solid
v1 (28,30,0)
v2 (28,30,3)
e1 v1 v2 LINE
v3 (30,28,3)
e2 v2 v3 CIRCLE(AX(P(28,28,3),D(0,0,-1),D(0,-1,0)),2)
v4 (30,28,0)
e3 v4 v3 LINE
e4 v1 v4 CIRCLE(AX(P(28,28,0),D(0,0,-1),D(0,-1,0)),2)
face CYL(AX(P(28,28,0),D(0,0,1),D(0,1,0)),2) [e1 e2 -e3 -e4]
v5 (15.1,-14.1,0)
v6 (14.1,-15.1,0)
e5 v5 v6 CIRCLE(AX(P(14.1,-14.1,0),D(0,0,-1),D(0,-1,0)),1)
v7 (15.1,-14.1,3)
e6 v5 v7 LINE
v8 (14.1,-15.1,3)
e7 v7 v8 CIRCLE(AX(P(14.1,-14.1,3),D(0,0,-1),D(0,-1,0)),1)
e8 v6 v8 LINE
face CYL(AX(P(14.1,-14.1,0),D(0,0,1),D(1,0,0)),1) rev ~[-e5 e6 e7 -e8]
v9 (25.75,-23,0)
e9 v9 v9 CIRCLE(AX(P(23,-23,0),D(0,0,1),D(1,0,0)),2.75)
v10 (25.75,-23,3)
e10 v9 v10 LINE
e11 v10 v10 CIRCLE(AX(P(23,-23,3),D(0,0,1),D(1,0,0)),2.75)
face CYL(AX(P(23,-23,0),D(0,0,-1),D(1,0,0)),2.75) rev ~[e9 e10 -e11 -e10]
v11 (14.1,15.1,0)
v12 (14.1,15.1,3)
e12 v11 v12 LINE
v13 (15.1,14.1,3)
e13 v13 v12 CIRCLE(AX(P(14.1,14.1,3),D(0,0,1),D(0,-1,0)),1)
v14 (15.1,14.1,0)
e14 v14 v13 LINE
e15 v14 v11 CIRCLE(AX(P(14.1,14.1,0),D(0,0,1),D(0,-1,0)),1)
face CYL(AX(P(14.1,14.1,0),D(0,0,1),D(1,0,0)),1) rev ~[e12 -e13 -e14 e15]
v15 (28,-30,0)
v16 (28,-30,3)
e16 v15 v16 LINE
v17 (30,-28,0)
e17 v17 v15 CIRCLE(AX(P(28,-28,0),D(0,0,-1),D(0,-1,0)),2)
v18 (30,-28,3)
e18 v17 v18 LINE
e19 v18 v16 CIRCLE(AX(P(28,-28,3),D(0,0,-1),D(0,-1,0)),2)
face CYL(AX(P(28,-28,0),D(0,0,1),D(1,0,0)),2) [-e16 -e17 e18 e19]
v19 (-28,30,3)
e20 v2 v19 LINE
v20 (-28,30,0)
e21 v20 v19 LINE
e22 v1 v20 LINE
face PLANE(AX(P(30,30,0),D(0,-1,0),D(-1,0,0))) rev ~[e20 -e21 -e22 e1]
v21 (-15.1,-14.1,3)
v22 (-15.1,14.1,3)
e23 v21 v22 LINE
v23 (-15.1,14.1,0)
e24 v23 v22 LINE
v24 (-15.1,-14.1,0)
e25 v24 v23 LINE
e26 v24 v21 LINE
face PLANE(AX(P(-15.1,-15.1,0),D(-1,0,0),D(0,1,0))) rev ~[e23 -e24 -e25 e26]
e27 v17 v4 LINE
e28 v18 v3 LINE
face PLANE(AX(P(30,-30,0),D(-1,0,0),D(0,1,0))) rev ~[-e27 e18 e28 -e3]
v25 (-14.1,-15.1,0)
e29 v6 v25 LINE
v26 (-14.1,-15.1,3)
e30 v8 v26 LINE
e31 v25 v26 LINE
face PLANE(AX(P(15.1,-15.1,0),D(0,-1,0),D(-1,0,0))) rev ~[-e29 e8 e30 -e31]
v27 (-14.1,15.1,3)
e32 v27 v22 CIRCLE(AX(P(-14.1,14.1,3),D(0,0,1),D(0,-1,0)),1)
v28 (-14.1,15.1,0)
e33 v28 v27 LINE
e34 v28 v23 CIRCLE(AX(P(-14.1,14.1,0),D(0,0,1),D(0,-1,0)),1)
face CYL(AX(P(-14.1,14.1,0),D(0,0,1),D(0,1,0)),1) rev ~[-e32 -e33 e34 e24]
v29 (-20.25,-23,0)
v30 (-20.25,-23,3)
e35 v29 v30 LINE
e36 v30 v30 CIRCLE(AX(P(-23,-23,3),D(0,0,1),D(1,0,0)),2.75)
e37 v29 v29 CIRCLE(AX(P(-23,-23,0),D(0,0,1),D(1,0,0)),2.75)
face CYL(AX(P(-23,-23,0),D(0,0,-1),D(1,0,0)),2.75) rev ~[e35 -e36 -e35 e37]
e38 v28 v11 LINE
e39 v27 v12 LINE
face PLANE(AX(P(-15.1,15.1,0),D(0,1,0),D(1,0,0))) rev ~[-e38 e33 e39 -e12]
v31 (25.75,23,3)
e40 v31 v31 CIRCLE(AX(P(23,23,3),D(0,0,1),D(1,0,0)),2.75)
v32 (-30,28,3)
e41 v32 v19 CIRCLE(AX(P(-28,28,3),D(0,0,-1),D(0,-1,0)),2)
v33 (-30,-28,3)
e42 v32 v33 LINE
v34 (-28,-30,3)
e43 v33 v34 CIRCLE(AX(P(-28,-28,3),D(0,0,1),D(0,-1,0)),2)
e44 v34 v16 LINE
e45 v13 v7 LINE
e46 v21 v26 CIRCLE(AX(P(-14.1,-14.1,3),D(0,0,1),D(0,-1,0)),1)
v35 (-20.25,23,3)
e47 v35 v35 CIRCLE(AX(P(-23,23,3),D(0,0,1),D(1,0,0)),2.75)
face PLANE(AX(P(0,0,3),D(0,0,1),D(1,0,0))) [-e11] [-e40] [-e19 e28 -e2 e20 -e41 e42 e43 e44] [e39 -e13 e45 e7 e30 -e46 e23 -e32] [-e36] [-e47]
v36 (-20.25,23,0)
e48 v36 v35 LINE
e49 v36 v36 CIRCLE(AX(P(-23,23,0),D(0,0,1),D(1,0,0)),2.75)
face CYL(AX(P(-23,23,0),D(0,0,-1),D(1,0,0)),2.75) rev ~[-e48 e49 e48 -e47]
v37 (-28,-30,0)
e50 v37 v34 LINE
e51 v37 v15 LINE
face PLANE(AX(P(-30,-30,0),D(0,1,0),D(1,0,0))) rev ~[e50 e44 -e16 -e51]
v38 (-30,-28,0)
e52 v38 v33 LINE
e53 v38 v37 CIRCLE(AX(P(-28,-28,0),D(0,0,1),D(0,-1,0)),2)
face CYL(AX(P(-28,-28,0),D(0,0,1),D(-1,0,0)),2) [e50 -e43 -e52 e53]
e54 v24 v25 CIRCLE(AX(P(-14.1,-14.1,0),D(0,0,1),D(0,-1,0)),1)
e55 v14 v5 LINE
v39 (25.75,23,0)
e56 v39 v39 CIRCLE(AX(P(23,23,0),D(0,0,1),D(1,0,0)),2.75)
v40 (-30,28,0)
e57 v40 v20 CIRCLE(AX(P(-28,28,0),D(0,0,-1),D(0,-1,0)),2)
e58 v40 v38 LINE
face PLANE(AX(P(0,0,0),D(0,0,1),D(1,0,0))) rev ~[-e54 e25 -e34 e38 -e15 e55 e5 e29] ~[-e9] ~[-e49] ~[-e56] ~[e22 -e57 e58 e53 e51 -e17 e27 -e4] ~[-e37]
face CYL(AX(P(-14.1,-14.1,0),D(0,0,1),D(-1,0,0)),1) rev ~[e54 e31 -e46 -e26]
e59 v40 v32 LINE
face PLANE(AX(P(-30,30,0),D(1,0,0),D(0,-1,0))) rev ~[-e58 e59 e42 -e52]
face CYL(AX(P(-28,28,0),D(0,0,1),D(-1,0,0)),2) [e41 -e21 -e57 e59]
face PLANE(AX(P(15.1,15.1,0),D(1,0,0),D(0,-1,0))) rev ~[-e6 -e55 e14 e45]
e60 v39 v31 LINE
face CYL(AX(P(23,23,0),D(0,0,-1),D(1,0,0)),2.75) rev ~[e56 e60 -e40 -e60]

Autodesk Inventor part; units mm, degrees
ref_plane "YZ Plane" through (0, 0, 0) normal (1, 0, 0) x (0, 1, 0)
ref_plane "XZ Plane" through (0, 0, 0) normal (0, 1, 0) x (-1, 0, 0)
ref_plane "XY Plane" through (0, 0, 0) normal (0, 0, 1) x (1, 0, 0)
sketch "Sketch1" plane through (0, 0, 0) normal (0, 0, 1) x (1, 0, 0)
  line L0 (-30, -30) -> (30, -30)
  line L1 (30, -30) -> (30, 30)
  line L2 (30, 30) -> (-30, 30)
  line L3 (-30, 30) -> (-30, -30)
  line L4 (-30, -30) -> (30, 30) construction
  line L5 (30, -30) -> (-30, 30) construction
  line L6 (15.1, -15.1) -> (-15.1, -15.1)
  line L7 (-15.1, -15.1) -> (-15.1, 15.1)
  line L8 (-15.1, 15.1) -> (15.1, 15.1)
  line L9 (15.1, 15.1) -> (15.1, -15.1)
  line L10 (15.1, -15.1) -> (-15.1, 15.1) construction
  line L11 (-15.1, -15.1) -> (15.1, 15.1) construction
  circle A0 centre (-23, -23) radius 2.75
  circle A1 centre (23, -23) radius 2.75
  circle A2 centre (23, 23) radius 2.75
  circle A3 centre (-23, 23) radius 2.75
  line L12 (25.75, 25.75) -> (-25.75, 25.75) construction
  line L13 (-25.75, 25.75) -> (-25.75, -25.75) construction
  line L14 (-25.75, -25.75) -> (25.75, -25.75) construction
  line L15 (25.75, -25.75) -> (25.75, 25.75) construction
  line L16 (25.75, 25.75) -> (-25.75, -25.75) construction
  line L17 (-25.75, 25.75) -> (25.75, -25.75) construction
  line L18 (23, 23) -> (-23, 23) construction
  line L19 (-23, 23) -> (-23, -23) construction
  line L20 (-23, -23) -> (23, -23) construction
  line L21 (23, -23) -> (23, 23) construction
  line L22 (23, 23) -> (-23, -23) construction
  line L23 (-23, 23) -> (23, -23) construction
  point P0 (0, 0)
  dimension "d172" = 30.2
  dimension "d190" = 5.5
  dimension "d191" = 46
  dimension "d192" = 60
extrude "Plate5" add sketch "Sketch1" along normal blind 3
fillet "Corner Round1" radius 2 4 edges at (30, 30, 1.5) (-30, 30, 1.5) (-30, -30, 1.5) (30, -30, 1.5)
fillet "Corner Round2" radius 1 4 edges at (-15.1, 15.1, 1.5) (-15.1, -15.1, 1.5) (15.1, -15.1, 1.5) (15.1, 15.1, 1.5)
properties part number "PRS 1200-52-04 FDS Way FLANGE" material "Stainless Steel"
